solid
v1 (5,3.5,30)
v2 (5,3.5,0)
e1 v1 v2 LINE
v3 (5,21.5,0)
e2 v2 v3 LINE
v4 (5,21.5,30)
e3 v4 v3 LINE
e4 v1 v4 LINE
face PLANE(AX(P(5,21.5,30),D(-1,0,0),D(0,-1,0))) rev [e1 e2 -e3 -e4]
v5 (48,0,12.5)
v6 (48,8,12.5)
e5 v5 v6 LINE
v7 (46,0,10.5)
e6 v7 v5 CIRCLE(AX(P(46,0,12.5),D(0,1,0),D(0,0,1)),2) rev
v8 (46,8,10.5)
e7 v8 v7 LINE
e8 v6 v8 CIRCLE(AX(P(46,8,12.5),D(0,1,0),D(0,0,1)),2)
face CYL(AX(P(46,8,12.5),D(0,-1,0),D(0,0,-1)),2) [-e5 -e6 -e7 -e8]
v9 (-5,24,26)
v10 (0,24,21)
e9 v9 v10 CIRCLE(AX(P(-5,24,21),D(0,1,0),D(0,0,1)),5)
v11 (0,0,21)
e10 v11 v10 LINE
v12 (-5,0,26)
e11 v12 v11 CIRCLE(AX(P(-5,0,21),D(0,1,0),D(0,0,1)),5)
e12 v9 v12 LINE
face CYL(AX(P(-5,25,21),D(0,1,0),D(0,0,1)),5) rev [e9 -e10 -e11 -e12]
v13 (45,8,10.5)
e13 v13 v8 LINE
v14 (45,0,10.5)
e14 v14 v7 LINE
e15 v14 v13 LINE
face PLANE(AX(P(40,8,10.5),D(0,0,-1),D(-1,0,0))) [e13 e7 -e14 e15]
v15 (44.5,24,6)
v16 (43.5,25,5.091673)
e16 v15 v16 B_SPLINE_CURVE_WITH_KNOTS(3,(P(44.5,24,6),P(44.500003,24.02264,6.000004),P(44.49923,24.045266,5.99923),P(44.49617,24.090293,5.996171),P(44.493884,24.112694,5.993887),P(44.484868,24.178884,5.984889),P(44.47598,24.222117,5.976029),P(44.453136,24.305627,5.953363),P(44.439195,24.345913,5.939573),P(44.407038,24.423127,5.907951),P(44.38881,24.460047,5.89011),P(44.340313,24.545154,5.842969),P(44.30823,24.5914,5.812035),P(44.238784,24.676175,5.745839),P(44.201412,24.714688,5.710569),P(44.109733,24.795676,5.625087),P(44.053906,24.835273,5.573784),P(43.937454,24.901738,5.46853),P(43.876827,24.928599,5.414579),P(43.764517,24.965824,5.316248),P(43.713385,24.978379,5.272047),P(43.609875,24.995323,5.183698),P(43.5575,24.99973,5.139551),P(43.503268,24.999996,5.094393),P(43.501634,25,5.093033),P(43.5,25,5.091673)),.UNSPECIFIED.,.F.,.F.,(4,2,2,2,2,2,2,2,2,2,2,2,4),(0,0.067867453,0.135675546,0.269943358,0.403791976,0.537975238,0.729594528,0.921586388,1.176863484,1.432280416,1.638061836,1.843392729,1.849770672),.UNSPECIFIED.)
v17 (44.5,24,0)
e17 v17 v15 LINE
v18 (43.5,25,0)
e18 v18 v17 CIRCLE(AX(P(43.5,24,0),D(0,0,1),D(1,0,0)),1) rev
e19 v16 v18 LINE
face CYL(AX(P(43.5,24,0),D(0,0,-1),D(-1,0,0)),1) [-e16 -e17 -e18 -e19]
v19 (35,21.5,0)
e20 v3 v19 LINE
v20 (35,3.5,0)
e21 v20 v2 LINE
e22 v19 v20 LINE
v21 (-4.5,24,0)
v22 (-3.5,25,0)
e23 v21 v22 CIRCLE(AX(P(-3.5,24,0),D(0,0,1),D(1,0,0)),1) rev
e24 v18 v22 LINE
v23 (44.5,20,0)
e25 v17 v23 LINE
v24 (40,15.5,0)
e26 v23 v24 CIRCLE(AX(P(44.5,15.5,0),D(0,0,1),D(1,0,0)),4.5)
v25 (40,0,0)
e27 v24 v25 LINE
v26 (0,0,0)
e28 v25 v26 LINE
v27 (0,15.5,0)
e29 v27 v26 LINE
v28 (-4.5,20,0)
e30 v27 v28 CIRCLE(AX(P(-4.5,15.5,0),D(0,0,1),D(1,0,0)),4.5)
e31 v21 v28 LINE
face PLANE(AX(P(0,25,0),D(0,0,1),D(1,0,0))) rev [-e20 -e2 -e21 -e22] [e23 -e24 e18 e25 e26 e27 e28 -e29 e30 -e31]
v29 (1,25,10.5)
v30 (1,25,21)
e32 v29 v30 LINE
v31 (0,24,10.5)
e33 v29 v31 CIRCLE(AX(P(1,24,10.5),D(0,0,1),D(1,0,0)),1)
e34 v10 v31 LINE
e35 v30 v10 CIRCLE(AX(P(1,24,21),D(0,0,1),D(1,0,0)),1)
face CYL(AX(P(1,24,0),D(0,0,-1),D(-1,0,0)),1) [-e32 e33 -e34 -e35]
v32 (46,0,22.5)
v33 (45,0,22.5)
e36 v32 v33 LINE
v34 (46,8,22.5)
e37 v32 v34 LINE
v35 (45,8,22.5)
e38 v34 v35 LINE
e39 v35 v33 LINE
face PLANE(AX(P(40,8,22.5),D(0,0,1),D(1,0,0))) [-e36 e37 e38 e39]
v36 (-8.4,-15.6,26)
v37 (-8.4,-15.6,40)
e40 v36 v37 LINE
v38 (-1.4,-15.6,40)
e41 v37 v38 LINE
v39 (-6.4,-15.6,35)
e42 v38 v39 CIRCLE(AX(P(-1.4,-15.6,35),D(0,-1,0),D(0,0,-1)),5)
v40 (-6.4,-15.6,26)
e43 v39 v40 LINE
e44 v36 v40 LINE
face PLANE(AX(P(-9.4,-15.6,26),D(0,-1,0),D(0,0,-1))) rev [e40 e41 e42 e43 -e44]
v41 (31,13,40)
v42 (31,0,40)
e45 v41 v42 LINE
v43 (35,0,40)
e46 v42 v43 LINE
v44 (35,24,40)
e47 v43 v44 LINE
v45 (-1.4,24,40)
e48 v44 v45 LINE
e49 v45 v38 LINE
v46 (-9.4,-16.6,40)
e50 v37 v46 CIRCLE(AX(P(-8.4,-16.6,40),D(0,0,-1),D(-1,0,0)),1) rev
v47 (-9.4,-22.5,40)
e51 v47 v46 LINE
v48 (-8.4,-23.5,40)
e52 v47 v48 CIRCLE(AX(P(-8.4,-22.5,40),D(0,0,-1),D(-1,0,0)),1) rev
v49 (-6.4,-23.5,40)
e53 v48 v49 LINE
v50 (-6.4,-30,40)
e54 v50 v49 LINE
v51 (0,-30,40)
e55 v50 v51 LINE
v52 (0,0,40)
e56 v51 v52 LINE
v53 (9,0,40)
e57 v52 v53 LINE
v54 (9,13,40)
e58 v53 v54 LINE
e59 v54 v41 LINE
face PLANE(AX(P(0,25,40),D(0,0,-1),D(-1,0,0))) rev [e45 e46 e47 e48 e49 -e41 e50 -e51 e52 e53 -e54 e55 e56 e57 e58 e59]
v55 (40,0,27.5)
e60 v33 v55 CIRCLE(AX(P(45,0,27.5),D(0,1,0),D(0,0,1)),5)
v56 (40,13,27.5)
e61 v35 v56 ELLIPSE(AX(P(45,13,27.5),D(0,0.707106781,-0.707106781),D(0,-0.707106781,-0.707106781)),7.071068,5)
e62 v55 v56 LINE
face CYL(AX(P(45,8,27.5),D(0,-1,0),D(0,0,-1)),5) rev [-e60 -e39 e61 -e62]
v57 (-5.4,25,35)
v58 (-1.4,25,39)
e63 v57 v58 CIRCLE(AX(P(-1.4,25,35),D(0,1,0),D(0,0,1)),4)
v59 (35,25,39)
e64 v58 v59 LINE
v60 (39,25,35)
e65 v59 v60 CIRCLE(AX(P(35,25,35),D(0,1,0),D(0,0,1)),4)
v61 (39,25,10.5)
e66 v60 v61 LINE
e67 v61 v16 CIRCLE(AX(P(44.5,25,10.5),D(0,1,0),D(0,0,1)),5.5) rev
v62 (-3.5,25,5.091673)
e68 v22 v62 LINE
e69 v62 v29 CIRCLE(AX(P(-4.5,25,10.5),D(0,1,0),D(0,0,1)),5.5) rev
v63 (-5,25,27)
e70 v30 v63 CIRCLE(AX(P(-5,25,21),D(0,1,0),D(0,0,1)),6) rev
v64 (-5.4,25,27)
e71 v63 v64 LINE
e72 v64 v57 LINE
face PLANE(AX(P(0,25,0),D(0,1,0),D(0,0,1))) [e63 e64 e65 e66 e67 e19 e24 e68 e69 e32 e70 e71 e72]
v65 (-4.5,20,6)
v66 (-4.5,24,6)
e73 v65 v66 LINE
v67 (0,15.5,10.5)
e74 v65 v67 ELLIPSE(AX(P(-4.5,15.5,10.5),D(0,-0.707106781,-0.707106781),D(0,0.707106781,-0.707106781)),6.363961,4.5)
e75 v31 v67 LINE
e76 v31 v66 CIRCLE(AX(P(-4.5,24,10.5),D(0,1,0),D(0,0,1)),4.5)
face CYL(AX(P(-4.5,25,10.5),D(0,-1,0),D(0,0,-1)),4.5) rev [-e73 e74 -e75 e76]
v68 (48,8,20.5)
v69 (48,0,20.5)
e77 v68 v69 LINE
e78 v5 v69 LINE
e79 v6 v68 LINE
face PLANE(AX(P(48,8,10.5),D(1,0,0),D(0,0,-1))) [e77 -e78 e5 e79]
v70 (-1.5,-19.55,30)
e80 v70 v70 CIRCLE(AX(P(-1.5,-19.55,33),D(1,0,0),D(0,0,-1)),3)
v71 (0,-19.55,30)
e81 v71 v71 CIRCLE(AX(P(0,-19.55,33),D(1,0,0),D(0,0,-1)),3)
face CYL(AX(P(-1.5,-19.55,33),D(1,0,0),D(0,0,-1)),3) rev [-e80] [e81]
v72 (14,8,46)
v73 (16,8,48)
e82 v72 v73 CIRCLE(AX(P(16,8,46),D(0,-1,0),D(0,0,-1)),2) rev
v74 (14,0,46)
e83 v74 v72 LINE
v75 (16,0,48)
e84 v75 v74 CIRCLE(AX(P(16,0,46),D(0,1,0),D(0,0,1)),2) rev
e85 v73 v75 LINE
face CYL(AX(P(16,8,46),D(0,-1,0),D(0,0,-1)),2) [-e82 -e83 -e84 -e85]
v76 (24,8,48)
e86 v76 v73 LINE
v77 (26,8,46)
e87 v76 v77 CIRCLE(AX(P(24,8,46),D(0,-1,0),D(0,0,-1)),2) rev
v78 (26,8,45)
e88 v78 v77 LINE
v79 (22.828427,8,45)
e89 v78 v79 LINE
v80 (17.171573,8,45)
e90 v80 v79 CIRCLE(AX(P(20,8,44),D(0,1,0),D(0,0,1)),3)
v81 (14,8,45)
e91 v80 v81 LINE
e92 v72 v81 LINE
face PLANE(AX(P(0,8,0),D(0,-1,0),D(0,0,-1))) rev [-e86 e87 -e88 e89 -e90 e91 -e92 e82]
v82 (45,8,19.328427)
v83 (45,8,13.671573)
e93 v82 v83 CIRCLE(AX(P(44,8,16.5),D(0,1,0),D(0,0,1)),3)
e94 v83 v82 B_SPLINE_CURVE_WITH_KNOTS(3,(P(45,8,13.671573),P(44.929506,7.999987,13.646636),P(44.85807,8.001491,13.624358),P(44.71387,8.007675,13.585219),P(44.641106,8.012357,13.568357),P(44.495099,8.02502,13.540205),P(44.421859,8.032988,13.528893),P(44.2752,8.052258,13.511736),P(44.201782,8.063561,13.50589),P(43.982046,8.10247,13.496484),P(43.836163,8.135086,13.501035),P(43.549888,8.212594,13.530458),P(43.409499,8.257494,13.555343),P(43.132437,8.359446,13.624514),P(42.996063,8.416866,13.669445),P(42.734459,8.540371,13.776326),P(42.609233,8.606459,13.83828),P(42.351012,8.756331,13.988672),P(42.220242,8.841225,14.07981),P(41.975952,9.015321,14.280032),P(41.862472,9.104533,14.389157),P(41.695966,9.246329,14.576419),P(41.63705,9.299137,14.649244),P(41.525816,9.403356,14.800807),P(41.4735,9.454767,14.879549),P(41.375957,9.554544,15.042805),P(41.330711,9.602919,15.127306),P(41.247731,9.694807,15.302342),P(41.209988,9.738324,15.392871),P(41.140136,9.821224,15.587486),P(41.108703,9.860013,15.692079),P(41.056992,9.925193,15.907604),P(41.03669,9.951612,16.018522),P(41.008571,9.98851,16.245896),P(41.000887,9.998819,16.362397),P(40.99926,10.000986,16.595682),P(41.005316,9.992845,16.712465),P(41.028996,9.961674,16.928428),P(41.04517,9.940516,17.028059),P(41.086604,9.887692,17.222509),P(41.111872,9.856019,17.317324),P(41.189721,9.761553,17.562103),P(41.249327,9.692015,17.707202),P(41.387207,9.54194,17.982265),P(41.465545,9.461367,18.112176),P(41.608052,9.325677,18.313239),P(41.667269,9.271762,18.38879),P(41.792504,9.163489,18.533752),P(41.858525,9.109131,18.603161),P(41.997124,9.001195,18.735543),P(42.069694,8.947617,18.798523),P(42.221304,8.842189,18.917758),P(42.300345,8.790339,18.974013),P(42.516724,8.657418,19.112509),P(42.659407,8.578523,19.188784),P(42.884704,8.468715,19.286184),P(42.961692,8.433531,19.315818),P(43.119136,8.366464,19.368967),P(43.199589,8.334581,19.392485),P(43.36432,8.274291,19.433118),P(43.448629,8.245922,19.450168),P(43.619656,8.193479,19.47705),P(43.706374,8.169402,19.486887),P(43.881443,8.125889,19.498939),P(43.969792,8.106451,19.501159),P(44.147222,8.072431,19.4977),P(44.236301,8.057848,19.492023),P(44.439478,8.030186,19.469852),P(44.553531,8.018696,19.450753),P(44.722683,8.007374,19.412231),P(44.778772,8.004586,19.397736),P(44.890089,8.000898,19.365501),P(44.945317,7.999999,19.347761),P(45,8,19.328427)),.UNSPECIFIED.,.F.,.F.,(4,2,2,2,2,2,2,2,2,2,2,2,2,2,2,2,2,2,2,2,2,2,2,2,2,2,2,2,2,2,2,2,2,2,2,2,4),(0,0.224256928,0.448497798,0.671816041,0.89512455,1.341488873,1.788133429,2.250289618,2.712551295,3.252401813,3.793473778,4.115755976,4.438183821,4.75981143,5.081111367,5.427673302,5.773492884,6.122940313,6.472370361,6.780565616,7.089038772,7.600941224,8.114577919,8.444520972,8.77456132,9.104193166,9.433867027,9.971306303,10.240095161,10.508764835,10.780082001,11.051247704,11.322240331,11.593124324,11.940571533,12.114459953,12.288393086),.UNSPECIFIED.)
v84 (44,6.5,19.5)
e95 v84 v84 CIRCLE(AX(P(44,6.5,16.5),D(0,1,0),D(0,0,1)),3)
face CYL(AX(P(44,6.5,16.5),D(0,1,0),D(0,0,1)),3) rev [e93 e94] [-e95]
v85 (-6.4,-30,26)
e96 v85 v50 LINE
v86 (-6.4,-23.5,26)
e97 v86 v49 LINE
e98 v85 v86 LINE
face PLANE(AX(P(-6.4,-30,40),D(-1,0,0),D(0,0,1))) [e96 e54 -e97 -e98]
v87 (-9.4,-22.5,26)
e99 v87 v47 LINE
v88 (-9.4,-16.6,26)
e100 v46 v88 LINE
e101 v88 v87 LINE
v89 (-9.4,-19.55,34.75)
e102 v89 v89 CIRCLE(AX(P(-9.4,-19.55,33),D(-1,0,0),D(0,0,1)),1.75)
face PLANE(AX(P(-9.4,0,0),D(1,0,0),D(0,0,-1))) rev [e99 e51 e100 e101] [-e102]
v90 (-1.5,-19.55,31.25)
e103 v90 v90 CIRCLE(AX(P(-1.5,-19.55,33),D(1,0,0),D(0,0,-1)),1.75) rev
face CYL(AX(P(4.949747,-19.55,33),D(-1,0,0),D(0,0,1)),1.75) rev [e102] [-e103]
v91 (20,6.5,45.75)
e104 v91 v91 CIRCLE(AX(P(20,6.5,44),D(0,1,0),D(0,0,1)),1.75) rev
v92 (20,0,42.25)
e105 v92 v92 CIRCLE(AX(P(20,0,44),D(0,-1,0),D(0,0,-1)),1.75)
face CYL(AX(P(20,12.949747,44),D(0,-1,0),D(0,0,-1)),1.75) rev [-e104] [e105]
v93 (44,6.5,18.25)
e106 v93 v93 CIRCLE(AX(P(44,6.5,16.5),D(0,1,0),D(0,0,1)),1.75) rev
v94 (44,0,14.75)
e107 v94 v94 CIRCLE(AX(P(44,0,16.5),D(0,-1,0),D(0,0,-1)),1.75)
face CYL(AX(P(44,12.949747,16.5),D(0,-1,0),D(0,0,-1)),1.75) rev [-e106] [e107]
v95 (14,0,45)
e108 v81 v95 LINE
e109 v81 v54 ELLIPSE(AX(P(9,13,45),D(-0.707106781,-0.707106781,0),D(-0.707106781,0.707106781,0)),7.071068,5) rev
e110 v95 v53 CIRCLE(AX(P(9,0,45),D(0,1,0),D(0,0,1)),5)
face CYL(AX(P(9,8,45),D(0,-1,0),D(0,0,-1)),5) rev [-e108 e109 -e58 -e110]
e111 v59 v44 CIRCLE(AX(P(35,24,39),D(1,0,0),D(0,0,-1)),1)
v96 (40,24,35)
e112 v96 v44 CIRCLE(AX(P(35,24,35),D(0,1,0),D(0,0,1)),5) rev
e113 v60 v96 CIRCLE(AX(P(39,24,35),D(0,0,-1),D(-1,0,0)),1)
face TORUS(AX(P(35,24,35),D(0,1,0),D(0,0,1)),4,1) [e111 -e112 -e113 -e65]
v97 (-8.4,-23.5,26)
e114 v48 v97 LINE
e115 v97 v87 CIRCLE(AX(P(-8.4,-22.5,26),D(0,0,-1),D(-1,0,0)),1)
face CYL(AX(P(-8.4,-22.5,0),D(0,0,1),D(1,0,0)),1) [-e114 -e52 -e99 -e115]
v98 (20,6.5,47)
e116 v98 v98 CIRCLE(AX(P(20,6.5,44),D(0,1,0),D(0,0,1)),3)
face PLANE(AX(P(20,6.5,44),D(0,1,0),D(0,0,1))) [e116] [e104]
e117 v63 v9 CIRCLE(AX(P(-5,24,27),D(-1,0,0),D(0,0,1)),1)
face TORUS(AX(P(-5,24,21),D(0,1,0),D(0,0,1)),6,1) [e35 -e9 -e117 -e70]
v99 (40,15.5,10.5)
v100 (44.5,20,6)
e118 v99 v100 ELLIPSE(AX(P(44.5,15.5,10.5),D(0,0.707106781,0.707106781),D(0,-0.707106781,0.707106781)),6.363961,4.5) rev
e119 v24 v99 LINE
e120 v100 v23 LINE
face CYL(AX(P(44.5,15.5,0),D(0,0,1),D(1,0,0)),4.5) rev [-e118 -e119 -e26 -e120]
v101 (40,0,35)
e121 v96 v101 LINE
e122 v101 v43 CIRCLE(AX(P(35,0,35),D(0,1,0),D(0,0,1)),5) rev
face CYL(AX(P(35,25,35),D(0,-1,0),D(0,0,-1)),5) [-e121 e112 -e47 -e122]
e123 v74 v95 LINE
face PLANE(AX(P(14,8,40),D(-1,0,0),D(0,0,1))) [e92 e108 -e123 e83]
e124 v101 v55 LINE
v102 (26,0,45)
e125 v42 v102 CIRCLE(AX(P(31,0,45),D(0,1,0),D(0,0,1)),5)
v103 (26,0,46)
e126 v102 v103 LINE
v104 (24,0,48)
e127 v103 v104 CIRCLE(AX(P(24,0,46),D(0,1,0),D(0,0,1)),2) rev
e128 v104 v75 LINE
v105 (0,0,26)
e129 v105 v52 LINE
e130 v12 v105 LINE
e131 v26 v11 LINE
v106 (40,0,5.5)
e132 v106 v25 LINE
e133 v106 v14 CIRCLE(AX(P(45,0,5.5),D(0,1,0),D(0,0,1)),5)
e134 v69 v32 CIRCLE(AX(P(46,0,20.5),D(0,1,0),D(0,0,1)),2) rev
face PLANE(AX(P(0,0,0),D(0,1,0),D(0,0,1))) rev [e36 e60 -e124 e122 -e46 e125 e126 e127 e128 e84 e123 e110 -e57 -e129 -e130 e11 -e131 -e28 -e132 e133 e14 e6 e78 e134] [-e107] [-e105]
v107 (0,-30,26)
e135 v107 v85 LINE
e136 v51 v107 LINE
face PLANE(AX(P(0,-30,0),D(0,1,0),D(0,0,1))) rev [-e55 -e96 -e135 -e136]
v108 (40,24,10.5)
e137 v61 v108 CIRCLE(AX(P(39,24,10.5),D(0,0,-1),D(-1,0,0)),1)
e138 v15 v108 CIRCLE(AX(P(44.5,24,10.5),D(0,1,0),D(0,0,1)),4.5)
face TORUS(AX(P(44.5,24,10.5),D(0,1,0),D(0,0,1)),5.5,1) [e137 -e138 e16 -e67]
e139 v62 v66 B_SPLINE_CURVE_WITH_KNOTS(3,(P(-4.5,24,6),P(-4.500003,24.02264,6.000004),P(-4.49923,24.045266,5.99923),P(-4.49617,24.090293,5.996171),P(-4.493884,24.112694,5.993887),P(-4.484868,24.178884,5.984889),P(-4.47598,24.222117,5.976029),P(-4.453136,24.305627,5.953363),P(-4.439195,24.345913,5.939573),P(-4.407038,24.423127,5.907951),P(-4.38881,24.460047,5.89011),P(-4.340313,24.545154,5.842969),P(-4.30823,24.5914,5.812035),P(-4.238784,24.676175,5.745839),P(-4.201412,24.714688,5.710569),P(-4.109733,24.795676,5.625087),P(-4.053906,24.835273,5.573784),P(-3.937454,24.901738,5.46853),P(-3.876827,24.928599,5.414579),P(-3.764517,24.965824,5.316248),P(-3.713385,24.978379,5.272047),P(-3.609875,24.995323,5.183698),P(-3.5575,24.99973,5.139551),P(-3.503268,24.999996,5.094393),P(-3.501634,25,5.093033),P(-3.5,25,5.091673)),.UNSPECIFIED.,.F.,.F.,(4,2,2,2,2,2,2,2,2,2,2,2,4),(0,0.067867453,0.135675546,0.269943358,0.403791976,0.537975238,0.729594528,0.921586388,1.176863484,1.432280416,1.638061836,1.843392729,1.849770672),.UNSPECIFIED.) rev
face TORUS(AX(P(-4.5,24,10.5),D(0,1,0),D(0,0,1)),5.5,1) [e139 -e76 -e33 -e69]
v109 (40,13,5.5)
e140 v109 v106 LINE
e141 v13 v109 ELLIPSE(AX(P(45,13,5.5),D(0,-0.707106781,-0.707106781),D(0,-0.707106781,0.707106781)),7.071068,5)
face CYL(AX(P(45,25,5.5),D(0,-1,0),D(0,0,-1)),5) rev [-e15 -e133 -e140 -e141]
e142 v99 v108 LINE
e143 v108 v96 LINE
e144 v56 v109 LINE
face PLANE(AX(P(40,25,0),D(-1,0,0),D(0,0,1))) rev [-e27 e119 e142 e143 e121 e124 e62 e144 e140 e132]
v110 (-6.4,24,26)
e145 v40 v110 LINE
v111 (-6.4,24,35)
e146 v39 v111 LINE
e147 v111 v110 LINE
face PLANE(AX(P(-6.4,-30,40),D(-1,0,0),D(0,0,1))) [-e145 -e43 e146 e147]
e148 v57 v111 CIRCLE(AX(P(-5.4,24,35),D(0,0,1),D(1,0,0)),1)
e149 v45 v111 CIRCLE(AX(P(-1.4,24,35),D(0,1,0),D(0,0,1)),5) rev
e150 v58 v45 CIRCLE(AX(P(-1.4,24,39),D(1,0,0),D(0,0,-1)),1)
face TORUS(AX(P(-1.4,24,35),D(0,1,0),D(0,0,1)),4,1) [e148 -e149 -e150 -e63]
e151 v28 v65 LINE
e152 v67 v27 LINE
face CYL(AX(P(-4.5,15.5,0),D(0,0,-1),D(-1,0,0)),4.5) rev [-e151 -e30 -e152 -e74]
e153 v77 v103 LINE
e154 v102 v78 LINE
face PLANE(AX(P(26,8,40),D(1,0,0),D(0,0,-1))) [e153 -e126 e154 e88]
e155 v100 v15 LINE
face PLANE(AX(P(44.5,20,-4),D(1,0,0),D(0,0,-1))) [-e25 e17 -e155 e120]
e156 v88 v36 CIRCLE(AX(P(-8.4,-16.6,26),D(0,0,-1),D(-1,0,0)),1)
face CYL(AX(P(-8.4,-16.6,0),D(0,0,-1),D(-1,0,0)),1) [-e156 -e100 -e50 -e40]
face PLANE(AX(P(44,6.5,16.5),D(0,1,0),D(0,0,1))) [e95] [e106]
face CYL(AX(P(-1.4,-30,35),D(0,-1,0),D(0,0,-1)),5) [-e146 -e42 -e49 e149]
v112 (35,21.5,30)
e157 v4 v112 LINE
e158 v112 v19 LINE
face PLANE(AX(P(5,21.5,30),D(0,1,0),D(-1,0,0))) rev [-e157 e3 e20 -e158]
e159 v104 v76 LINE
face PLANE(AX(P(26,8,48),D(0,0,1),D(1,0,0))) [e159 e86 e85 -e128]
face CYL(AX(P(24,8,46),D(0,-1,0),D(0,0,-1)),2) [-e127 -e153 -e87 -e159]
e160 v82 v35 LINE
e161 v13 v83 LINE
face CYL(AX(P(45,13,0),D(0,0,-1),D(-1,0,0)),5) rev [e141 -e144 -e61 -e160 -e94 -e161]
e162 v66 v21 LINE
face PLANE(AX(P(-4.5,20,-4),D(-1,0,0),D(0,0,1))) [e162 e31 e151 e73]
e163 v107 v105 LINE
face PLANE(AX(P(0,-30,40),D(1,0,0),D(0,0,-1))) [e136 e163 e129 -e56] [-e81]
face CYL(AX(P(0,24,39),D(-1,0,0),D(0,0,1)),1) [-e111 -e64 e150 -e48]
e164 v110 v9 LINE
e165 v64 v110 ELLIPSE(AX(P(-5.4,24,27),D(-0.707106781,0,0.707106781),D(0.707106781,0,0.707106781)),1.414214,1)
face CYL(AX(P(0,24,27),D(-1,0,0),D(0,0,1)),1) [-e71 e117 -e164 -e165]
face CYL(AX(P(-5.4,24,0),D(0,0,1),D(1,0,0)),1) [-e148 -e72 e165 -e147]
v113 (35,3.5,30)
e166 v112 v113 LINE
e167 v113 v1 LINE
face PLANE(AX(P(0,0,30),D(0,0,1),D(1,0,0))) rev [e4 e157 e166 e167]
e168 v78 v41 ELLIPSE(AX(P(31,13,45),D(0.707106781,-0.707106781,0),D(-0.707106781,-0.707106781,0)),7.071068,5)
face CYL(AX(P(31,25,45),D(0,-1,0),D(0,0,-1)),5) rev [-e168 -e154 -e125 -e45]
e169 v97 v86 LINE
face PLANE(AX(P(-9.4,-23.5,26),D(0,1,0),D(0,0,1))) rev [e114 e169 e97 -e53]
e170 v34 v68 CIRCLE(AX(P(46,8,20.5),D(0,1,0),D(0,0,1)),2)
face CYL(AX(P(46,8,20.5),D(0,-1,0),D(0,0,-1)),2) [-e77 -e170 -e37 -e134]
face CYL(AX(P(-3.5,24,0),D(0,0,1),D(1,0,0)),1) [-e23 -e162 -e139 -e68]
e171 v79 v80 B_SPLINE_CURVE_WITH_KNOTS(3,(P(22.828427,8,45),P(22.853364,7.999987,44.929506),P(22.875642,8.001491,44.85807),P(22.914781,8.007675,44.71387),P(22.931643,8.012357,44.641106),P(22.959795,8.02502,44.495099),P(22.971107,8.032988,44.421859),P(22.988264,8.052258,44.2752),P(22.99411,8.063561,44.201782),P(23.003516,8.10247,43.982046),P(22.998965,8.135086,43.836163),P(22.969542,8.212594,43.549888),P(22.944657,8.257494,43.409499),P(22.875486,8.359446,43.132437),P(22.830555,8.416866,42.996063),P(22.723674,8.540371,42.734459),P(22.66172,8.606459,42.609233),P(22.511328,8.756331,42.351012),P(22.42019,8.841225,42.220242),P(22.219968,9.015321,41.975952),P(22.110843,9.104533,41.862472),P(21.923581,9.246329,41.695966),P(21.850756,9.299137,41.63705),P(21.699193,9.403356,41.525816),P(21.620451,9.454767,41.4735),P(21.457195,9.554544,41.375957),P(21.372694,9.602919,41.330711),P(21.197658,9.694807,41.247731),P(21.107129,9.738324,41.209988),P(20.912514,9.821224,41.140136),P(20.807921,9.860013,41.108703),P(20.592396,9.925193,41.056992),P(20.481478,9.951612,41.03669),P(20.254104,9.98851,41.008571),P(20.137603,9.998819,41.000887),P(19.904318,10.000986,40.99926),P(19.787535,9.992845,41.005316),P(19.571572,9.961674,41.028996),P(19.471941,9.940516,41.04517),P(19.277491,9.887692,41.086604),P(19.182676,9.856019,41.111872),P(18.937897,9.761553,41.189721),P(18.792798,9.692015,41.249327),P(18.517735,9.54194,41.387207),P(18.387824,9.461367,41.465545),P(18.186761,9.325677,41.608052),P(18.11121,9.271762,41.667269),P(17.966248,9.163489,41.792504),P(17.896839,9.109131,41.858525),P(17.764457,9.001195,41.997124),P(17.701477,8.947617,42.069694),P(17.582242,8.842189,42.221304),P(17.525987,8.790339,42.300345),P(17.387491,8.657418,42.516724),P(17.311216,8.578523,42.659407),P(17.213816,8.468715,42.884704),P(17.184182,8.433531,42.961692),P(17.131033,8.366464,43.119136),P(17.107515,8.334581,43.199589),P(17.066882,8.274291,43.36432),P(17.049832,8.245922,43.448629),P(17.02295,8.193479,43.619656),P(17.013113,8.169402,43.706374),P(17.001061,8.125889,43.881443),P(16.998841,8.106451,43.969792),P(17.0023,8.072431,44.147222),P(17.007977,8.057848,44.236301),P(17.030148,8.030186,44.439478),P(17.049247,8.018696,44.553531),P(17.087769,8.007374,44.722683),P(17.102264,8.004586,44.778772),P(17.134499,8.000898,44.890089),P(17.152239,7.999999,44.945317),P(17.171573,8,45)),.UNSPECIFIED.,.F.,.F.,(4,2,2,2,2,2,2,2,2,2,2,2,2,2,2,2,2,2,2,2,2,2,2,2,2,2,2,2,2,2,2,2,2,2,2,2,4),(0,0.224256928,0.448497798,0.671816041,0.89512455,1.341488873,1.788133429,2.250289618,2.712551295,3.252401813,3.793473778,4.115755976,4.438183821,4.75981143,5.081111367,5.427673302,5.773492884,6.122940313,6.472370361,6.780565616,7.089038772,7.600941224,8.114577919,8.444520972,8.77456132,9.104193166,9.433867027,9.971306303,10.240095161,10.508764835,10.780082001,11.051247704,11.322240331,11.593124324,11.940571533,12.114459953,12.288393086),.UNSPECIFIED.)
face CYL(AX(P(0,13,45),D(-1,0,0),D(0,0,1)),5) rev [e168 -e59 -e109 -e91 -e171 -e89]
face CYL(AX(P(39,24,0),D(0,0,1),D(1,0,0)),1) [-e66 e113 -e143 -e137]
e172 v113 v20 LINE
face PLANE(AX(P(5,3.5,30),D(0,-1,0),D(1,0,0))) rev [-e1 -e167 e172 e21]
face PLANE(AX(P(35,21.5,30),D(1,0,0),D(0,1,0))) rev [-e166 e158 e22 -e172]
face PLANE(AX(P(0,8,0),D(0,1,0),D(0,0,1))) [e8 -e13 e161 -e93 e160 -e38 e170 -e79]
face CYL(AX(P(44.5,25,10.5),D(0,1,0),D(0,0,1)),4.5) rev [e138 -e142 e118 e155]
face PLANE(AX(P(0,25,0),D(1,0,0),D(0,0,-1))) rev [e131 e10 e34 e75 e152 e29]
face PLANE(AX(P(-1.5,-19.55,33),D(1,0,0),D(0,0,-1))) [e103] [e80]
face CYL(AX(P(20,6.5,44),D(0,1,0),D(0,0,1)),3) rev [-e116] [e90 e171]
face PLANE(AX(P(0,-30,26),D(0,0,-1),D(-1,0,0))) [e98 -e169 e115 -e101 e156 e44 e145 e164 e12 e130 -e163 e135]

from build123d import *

# Parameters (mm, degrees)
CROQUIS1_W              = 40
CROQUIS1_H              = 40
SALIENTE_EXTRUIR1_DEPTH = 25
CROQUIS3_W              = 30
CROQUIS3_H              = 18
CORTAR_EXTRUIR1_DEPTH   = 30
CROQUIS4_W              = 9
CROQUIS4_H              = 10
SALIENTE_EXTRUIR2_DEPTH = 5
REDONDEO3_R             = 4.5
CROQUIS6_W              = 6.4
CROQUIS6_H              = 14
SALIENTE_EXTRUIR3_DEPTH = 55
CROQUIS7_W              = 14
CROQUIS7_H              = 7.9
SALIENTE_EXTRUIR4_DEPTH = 3
CROQUIS8_R              = 1.75
CORTAR_EXTRUIR2_DEPTH   = 9.4
CROQUIS9_R              = 3
CORTAR_EXTRUIR3_DEPTH   = 1.5
REDONDEO4_R             = 1
CROQUIS10_W             = 8
CROQUIS10_H             = 12
CROQUIS10_W_2           = 12
CROQUIS10_H_2           = 8
SALIENTE_EXTRUIR5_DEPTH = 8
CROQUIS11_R             = 1.75
CORTAR_EXTRUIR4_DEPTH   = 8
CROQUIS12_R             = 3
CORTAR_EXTRUIR5_DEPTH   = 1.5
REDONDEO5_R             = 5
REDONDEO6_R             = 1
REDONDEO7_R             = 2
CROQUIS13_W             = 9
CROQUIS13_H             = 4
CORTAR_EXTRUIR6_DEPTH   = 85.308955633


# Some blends are built 0.0001 mm under size
with BuildPart() as part:
    # Croquis1 → Saliente-Extruir1 (new body)
    with BuildSketch(Plane(origin=(0, 0, 0), x_dir=(1, 0, 0), z_dir=(0, 1, 0))):
        with Locations((20, -20)):
            Rectangle(CROQUIS1_W, CROQUIS1_H)
    extrude(amount=SALIENTE_EXTRUIR1_DEPTH)

    # Croquis3 → Cortar-Extruir1 (cut)
    with BuildSketch(Plane(origin=(0, 0, 0), x_dir=(-1, 0, 0), z_dir=(0, 0, -1))):
        with Locations((-20, 12.5)):
            Rectangle(CROQUIS3_W, CROQUIS3_H)
    extrude(amount=-CORTAR_EXTRUIR1_DEPTH, mode=Mode.SUBTRACT)

    # Croquis4 → Saliente-Extruir2 (add)
    with BuildSketch(Plane(origin=(0, 25, 0), x_dir=(1, 0, 0), z_dir=(0, 1, 0))):
        with Locations((40, -1)):
            Rectangle(CROQUIS4_W, CROQUIS4_H)
        with Locations((0, -1)):
            Rectangle(CROQUIS4_W, CROQUIS4_H)
    extrude(amount=-SALIENTE_EXTRUIR2_DEPTH)

    # Redondeo3
    redondeo3_edges = [part.edges().sort_by_distance(p)[0] for p in [
        (0, 22.5, 6),
        (40, 22.5, 6),
        (0, 20, 3),
        (40, 20, 3),
    ]]
    fillet(redondeo3_edges, radius=REDONDEO3_R - 0.0001)  # a hair under: the kernel refuses the full size

    # Croquis6 → Saliente-Extruir3 (add)
    with BuildSketch(Plane(origin=(0, 25, 0), x_dir=(1, 0, 0), z_dir=(0, 1, 0))):
        with Locations((-3.2, -33)):
            Rectangle(CROQUIS6_W, CROQUIS6_H)
    extrude(amount=-SALIENTE_EXTRUIR3_DEPTH)

    # Croquis7 → Saliente-Extruir4 (add)
    with BuildSketch(Plane.ZY.offset(6.4)):
        with Locations((33, -19.55)):
            Rectangle(CROQUIS7_W, CROQUIS7_H)
    extrude(amount=SALIENTE_EXTRUIR4_DEPTH)

    # Croquis8 → Cortar-Extruir2 (cut)
    with BuildSketch(Plane.ZY.offset(9.4)):
        with Locations((33, -19.55)):
            Circle(CROQUIS8_R)
    extrude(amount=-CORTAR_EXTRUIR2_DEPTH, mode=Mode.SUBTRACT)

    # Croquis9 → Cortar-Extruir3 (cut)
    with BuildSketch(Plane(origin=(0, 0, 0), x_dir=(0, 0, -1), z_dir=(1, 0, 0))):
        with Locations((-33, -19.55)):
            Circle(CROQUIS9_R)
    extrude(amount=-CORTAR_EXTRUIR3_DEPTH, mode=Mode.SUBTRACT)

    # Redondeo4
    redondeo4_edges = [part.edges().sort_by_distance(p)[0] for p in [
        (-9.4, -23.5, 33),
        (-9.4, -15.6, 33),
    ]]
    fillet(redondeo4_edges, radius=REDONDEO4_R)

    # Croquis10 → Saliente-Extruir5 (add)
    with BuildSketch(Plane.XZ):
        with Locations((44, 16.5)):
            Rectangle(CROQUIS10_W, CROQUIS10_H)
        with Locations((20, 44)):
            Rectangle(CROQUIS10_W_2, CROQUIS10_H_2)
    extrude(amount=-SALIENTE_EXTRUIR5_DEPTH)

    # Croquis11 → Cortar-Extruir4 (cut)
    with BuildSketch(Plane.XZ):
        with Locations(Location((44, 16.5, 0), (0, 0, 270))):
            Circle(CROQUIS11_R)
        with Locations(Location((20, 44, 0), (0, 0, 270))):
            Circle(CROQUIS11_R)
    extrude(amount=-CORTAR_EXTRUIR4_DEPTH, mode=Mode.SUBTRACT)

    # Croquis12 → Cortar-Extruir5 (cut)
    with BuildSketch(Plane(origin=(0, 8, 0), x_dir=(1, 0, 0), z_dir=(0, 1, 0))):
        with Locations(Location((44, -16.5, 0), (0, 0, 270))):
            Circle(CROQUIS12_R)
        with Locations(Location((20, -44, 0), (0, 0, 270))):
            Circle(CROQUIS12_R)
    extrude(amount=-CORTAR_EXTRUIR5_DEPTH, mode=Mode.SUBTRACT)

    # Redondeo5
    # the kernel refuses this fillet: 5 mm, written as the material it adds along each edge
    with BuildSketch(Plane(origin=(0, 25, 26), x_dir=(-1, 0, 0), z_dir=(0, -1, 0))) as redondeo5_piece_1_section:
        with BuildLine():
            CenterArc((REDONDEO5_R, REDONDEO5_R), REDONDEO5_R, 180, 90)
            Line((0, REDONDEO5_R), (-REDONDEO5_R * 0.02, REDONDEO5_R))
            Line((-REDONDEO5_R * 0.02, REDONDEO5_R), (-REDONDEO5_R * 0.02, -REDONDEO5_R * 0.02))
            Line((-REDONDEO5_R * 0.02, -REDONDEO5_R * 0.02), (REDONDEO5_R, -REDONDEO5_R * 0.02))
            Line((REDONDEO5_R, -REDONDEO5_R * 0.02), (REDONDEO5_R, 0))
        make_face()
    redondeo5_piece_1 = extrude(amount=25, mode=Mode.PRIVATE)
    redondeo5_piece_1 = split(redondeo5_piece_1, bisect_by=Plane(origin=(0, 12.5, 24.982634351), z_dir=(-1, 0, 0)), keep=Keep.TOP, mode=Mode.PRIVATE)
    add(redondeo5_piece_1)
    with BuildSketch(Plane(origin=(40, 8, 22.5), x_dir=(0, 1, 0), z_dir=(0, 0, -1))) as redondeo5_piece_2_section:
        with BuildLine():
            CenterArc((REDONDEO5_R, REDONDEO5_R), REDONDEO5_R, 180, 90)
            Line((0, REDONDEO5_R), (-REDONDEO5_R * 0.02, REDONDEO5_R))
            Line((-REDONDEO5_R * 0.02, REDONDEO5_R), (-REDONDEO5_R * 0.02, -REDONDEO5_R * 0.02))
            Line((-REDONDEO5_R * 0.02, -REDONDEO5_R * 0.02), (REDONDEO5_R, -REDONDEO5_R * 0.02))
            Line((REDONDEO5_R, -REDONDEO5_R * 0.02), (REDONDEO5_R, 0))
        make_face()
    redondeo5_piece_2 = extrude(amount=12, mode=Mode.PRIVATE)
    redondeo5_piece_2 = redondeo5_piece_2 - Plane(origin=(44, 9.261889054, 16.5), x_dir=(0, 0, 1), z_dir=(0, 1, 0)) * Cylinder(3, 44, mode=Mode.PRIVATE)
    add(redondeo5_piece_2)
    with BuildSketch(Plane(origin=(40, 0, 10.5), x_dir=(0, 0, -1), z_dir=(0, 1, 0)), Plane(origin=(26, 0, 40), x_dir=(1, 0, 0), z_dir=(0, 1, 0))) as redondeo5_piece_3:
        with BuildLine():
            CenterArc((REDONDEO5_R, -REDONDEO5_R), REDONDEO5_R, 90, 90)
            Line((0, -REDONDEO5_R), (-REDONDEO5_R * 0.02, -REDONDEO5_R))
            Line((-REDONDEO5_R * 0.02, -REDONDEO5_R), (-REDONDEO5_R * 0.02, REDONDEO5_R * 0.02))
            Line((-REDONDEO5_R * 0.02, REDONDEO5_R * 0.02), (REDONDEO5_R, REDONDEO5_R * 0.02))
            Line((REDONDEO5_R, REDONDEO5_R * 0.02), (REDONDEO5_R, 0))
        make_face()
    extrude(amount=8)
    with BuildSketch(Plane(origin=(40, 0, 22.5), x_dir=(0, 0, 1), z_dir=(0, 1, 0)), Plane(origin=(14, 0, 40), x_dir=(-1, 0, 0), z_dir=(0, 1, 0))) as redondeo5_piece_4:
        with BuildLine():
            CenterArc((REDONDEO5_R, REDONDEO5_R), REDONDEO5_R, 180, 90)
            Line((0, REDONDEO5_R), (-REDONDEO5_R * 0.02, REDONDEO5_R))
            Line((-REDONDEO5_R * 0.02, REDONDEO5_R), (-REDONDEO5_R * 0.02, -REDONDEO5_R * 0.02))
            Line((-REDONDEO5_R * 0.02, -REDONDEO5_R * 0.02), (REDONDEO5_R, -REDONDEO5_R * 0.02))
            Line((REDONDEO5_R, -REDONDEO5_R * 0.02), (REDONDEO5_R, 0))
        make_face()
    extrude(amount=8)
    with BuildSketch(Plane(origin=(26, 8, 40), x_dir=(0, 1, 0), z_dir=(-1, 0, 0))) as redondeo5_piece_5_section:
        with BuildLine():
            CenterArc((REDONDEO5_R, -REDONDEO5_R), REDONDEO5_R, 90, 90)
            Line((0, -REDONDEO5_R), (-REDONDEO5_R * 0.02, -REDONDEO5_R))
            Line((-REDONDEO5_R * 0.02, -REDONDEO5_R), (-REDONDEO5_R * 0.02, REDONDEO5_R * 0.02))
            Line((-REDONDEO5_R * 0.02, REDONDEO5_R * 0.02), (REDONDEO5_R, REDONDEO5_R * 0.02))
            Line((REDONDEO5_R, REDONDEO5_R * 0.02), (REDONDEO5_R, 0))
        make_face()
    redondeo5_piece_5 = extrude(amount=12, mode=Mode.PRIVATE)
    redondeo5_piece_5 = redondeo5_piece_5 - Plane(origin=(20, 9.261884867, 44), x_dir=(0, 0, 1), z_dir=(0, 1, 0)) * Cylinder(3, 44, mode=Mode.PRIVATE)
    add(redondeo5_piece_5)
    with BuildSketch(Plane(origin=(40, 8, 35), x_dir=(0, 1, 0), z_dir=(0, 0, -1))) as redondeo5_piece_6a_section:
        with BuildLine():
            CenterArc((REDONDEO5_R, REDONDEO5_R), REDONDEO5_R, 180, 90)
            Line((0, REDONDEO5_R), (-REDONDEO5_R * 0.02, REDONDEO5_R))
            Line((-REDONDEO5_R * 0.02, REDONDEO5_R), (-REDONDEO5_R * 0.02, -REDONDEO5_R * 0.02))
            Line((-REDONDEO5_R * 0.02, -REDONDEO5_R * 0.02), (REDONDEO5_R, -REDONDEO5_R * 0.02))
            Line((REDONDEO5_R, -REDONDEO5_R * 0.02), (REDONDEO5_R, 0))
        make_face()
    redondeo5_piece_6a = extrude(amount=24.5, mode=Mode.PRIVATE)
    redondeo5_piece_6a = split(redondeo5_piece_6a, bisect_by=Plane(origin=(41.131975571, 9.131975571, 22.5), z_dir=(0, 0, 1)), keep=Keep.TOP, mode=Mode.PRIVATE)
    with BuildSketch(Plane(origin=(40, 0, 22.5), x_dir=(0, 0, 1), z_dir=(0, 1, 0))) as redondeo5_piece_6b_section:
        with BuildLine():
            CenterArc((REDONDEO5_R, REDONDEO5_R), REDONDEO5_R, 180, 90)
            Line((0, REDONDEO5_R), (-REDONDEO5_R * 0.02, REDONDEO5_R))
            Line((-REDONDEO5_R * 0.02, REDONDEO5_R), (-REDONDEO5_R * 0.02, -REDONDEO5_R * 0.02))
            Line((-REDONDEO5_R * 0.02, -REDONDEO5_R * 0.02), (REDONDEO5_R, -REDONDEO5_R * 0.02))
            Line((REDONDEO5_R, -REDONDEO5_R * 0.02), (REDONDEO5_R, 0))
        make_face()
    redondeo5_piece_6b = extrude(amount=20.5, mode=Mode.PRIVATE)
    redondeo5_piece_6b = split(redondeo5_piece_6b, bisect_by=Plane(origin=(41.131975571, 8, 23.631975571), z_dir=(0, 1, 0)), keep=Keep.TOP, mode=Mode.PRIVATE)
    redondeo5_piece_6 = redondeo5_piece_6a & redondeo5_piece_6b
    add(redondeo5_piece_6)
    with BuildSketch(Plane(origin=(40, 0, 10.5), x_dir=(0, 0, -1), z_dir=(0, 1, 0))) as redondeo5_piece_7a_section:
        with BuildLine():
            CenterArc((REDONDEO5_R, -REDONDEO5_R), REDONDEO5_R, 90, 90)
            Line((0, -REDONDEO5_R), (-REDONDEO5_R * 0.02, -REDONDEO5_R))
            Line((-REDONDEO5_R * 0.02, -REDONDEO5_R), (-REDONDEO5_R * 0.02, REDONDEO5_R * 0.02))
            Line((-REDONDEO5_R * 0.02, REDONDEO5_R * 0.02), (REDONDEO5_R, REDONDEO5_R * 0.02))
            Line((REDONDEO5_R, REDONDEO5_R * 0.02), (REDONDEO5_R, 0))
        make_face()
    redondeo5_piece_7a = extrude(amount=20.5, mode=Mode.PRIVATE)
    redondeo5_piece_7a = split(redondeo5_piece_7a, bisect_by=Plane(origin=(41.131975571, 8, 9.368024429), z_dir=(0, 1, 0)), keep=Keep.TOP, mode=Mode.PRIVATE)
    with BuildSketch(Plane(origin=(40, 8, 22.5), x_dir=(0, 1, 0), z_dir=(0, 0, -1))) as redondeo5_piece_7b_section:
        with BuildLine():
            CenterArc((REDONDEO5_R, REDONDEO5_R), REDONDEO5_R, 180, 90)
            Line((0, REDONDEO5_R), (-REDONDEO5_R * 0.02, REDONDEO5_R))
            Line((-REDONDEO5_R * 0.02, REDONDEO5_R), (-REDONDEO5_R * 0.02, -REDONDEO5_R * 0.02))
            Line((-REDONDEO5_R * 0.02, -REDONDEO5_R * 0.02), (REDONDEO5_R, -REDONDEO5_R * 0.02))
            Line((REDONDEO5_R, -REDONDEO5_R * 0.02), (REDONDEO5_R, 0))
        make_face()
    redondeo5_piece_7b = extrude(amount=24.5, mode=Mode.PRIVATE)
    redondeo5_piece_7b = split(redondeo5_piece_7b, bisect_by=Plane(origin=(41.131975571, 9.131975571, 0), z_dir=(0, 0, 1)), keep=Keep.TOP, mode=Mode.PRIVATE)
    redondeo5_piece_7b = split(redondeo5_piece_7b, bisect_by=Plane(origin=(41.131975571, 9.131975571, 10.5), z_dir=(0, 0, -1)), keep=Keep.TOP, mode=Mode.PRIVATE)
    redondeo5_piece_7 = redondeo5_piece_7a & redondeo5_piece_7b
    add(redondeo5_piece_7)
    with BuildSketch(Plane(origin=(26, 0, 40), x_dir=(1, 0, 0), z_dir=(0, 1, 0))) as redondeo5_piece_8a_section:
        with BuildLine():
            CenterArc((REDONDEO5_R, -REDONDEO5_R), REDONDEO5_R, 90, 90)
            Line((0, -REDONDEO5_R), (-REDONDEO5_R * 0.02, -REDONDEO5_R))
            Line((-REDONDEO5_R * 0.02, -REDONDEO5_R), (-REDONDEO5_R * 0.02, REDONDEO5_R * 0.02))
            Line((-REDONDEO5_R * 0.02, REDONDEO5_R * 0.02), (REDONDEO5_R, REDONDEO5_R * 0.02))
            Line((REDONDEO5_R, REDONDEO5_R * 0.02), (REDONDEO5_R, 0))
        make_face()
    redondeo5_piece_8a = extrude(amount=20.5, mode=Mode.PRIVATE)
    redondeo5_piece_8a = split(redondeo5_piece_8a, bisect_by=Plane(origin=(27.131975571, 8, 41.131975571), z_dir=(0, 1, 0)), keep=Keep.TOP, mode=Mode.PRIVATE)
    with BuildSketch(Plane(origin=(38.5, 8, 40), x_dir=(0, 1, 0), z_dir=(-1, 0, 0))) as redondeo5_piece_8b_section:
        with BuildLine():
            CenterArc((REDONDEO5_R, -REDONDEO5_R), REDONDEO5_R, 90, 90)
            Line((0, -REDONDEO5_R), (-REDONDEO5_R * 0.02, -REDONDEO5_R))
            Line((-REDONDEO5_R * 0.02, -REDONDEO5_R), (-REDONDEO5_R * 0.02, REDONDEO5_R * 0.02))
            Line((-REDONDEO5_R * 0.02, REDONDEO5_R * 0.02), (REDONDEO5_R, REDONDEO5_R * 0.02))
            Line((REDONDEO5_R, REDONDEO5_R * 0.02), (REDONDEO5_R, 0))
        make_face()
    redondeo5_piece_8b = extrude(amount=24.5, mode=Mode.PRIVATE)
    redondeo5_piece_8b = split(redondeo5_piece_8b, bisect_by=Plane(origin=(26, 9.131975571, 41.131975571), z_dir=(1, 0, 0)), keep=Keep.TOP, mode=Mode.PRIVATE)
    redondeo5_piece_8 = redondeo5_piece_8a & redondeo5_piece_8b
    add(redondeo5_piece_8)
    with BuildSketch(Plane(origin=(26, 8, 40), x_dir=(0, 1, 0), z_dir=(-1, 0, 0))) as redondeo5_piece_9a_section:
        with BuildLine():
            CenterArc((REDONDEO5_R, -REDONDEO5_R), REDONDEO5_R, 90, 90)
            Line((0, -REDONDEO5_R), (-REDONDEO5_R * 0.02, -REDONDEO5_R))
            Line((-REDONDEO5_R * 0.02, -REDONDEO5_R), (-REDONDEO5_R * 0.02, REDONDEO5_R * 0.02))
            Line((-REDONDEO5_R * 0.02, REDONDEO5_R * 0.02), (REDONDEO5_R, REDONDEO5_R * 0.02))
            Line((REDONDEO5_R, REDONDEO5_R * 0.02), (REDONDEO5_R, 0))
        make_face()
    redondeo5_piece_9a = extrude(amount=24.5, mode=Mode.PRIVATE)
    redondeo5_piece_9a = split(redondeo5_piece_9a, bisect_by=Plane(origin=(14, 9.131975571, 41.131975571), z_dir=(-1, 0, 0)), keep=Keep.TOP, mode=Mode.PRIVATE)
    with BuildSketch(Plane(origin=(14, 0, 40), x_dir=(-1, 0, 0), z_dir=(0, 1, 0))) as redondeo5_piece_9b_section:
        with BuildLine():
            CenterArc((REDONDEO5_R, REDONDEO5_R), REDONDEO5_R, 180, 90)
            Line((0, REDONDEO5_R), (-REDONDEO5_R * 0.02, REDONDEO5_R))
            Line((-REDONDEO5_R * 0.02, REDONDEO5_R), (-REDONDEO5_R * 0.02, -REDONDEO5_R * 0.02))
            Line((-REDONDEO5_R * 0.02, -REDONDEO5_R * 0.02), (REDONDEO5_R, -REDONDEO5_R * 0.02))
            Line((REDONDEO5_R, -REDONDEO5_R * 0.02), (REDONDEO5_R, 0))
        make_face()
    redondeo5_piece_9b = extrude(amount=20.5, mode=Mode.PRIVATE)
    redondeo5_piece_9b = split(redondeo5_piece_9b, bisect_by=Plane(origin=(12.868024429, 8, 41.131975571), z_dir=(0, 1, 0)), keep=Keep.TOP, mode=Mode.PRIVATE)
    redondeo5_piece_9 = redondeo5_piece_9a & redondeo5_piece_9b
    add(redondeo5_piece_9)
    # the kernel refuses this fillet: 5 mm, written as the material it takes off along each edge
    with BuildSketch(Plane(origin=(-6.4, 25, 40), x_dir=(1, 0, 0), z_dir=(0, -1, 0))) as redondeo5_2_piece_1:
        with BuildLine():
            CenterArc((REDONDEO5_R, -REDONDEO5_R), REDONDEO5_R, 90, 90)
            Line((0, -REDONDEO5_R), (-REDONDEO5_R * 0.02, -REDONDEO5_R))
            Line((-REDONDEO5_R * 0.02, -REDONDEO5_R), (-REDONDEO5_R * 0.02, REDONDEO5_R * 0.02))
            Line((-REDONDEO5_R * 0.02, REDONDEO5_R * 0.02), (REDONDEO5_R, REDONDEO5_R * 0.02))
            Line((REDONDEO5_R, REDONDEO5_R * 0.02), (REDONDEO5_R, 0))
        make_face()
    extrude(amount=40.6, mode=Mode.SUBTRACT)
    with BuildSketch(Plane(origin=(40, 0, 40), x_dir=(-1, 0, 0), z_dir=(0, 1, 0))) as redondeo5_2_piece_2:
        with BuildLine():
            CenterArc((REDONDEO5_R, -REDONDEO5_R), REDONDEO5_R, 90, 90)
            Line((0, -REDONDEO5_R), (-REDONDEO5_R * 0.02, -REDONDEO5_R))
            Line((-REDONDEO5_R * 0.02, -REDONDEO5_R), (-REDONDEO5_R * 0.02, REDONDEO5_R * 0.02))
            Line((-REDONDEO5_R * 0.02, REDONDEO5_R * 0.02), (REDONDEO5_R, REDONDEO5_R * 0.02))
            Line((REDONDEO5_R, REDONDEO5_R * 0.02), (REDONDEO5_R, 0))
        make_face()
    extrude(amount=25, mode=Mode.SUBTRACT)

    # Redondeo6
    # the kernel refuses this fillet: 1 mm, written as the material it takes off along each edge
    with BuildSketch(Plane(origin=(-6.4, 25, 35), x_dir=(1, 0, 0), z_dir=(0, 0, -1))) as redondeo6_piece_1:
        with BuildLine():
            CenterArc((REDONDEO6_R, REDONDEO6_R), REDONDEO6_R, 180, 90)
            Line((0, REDONDEO6_R), (0, 0))
            Line((0, 0), (REDONDEO6_R, 0))
        make_face()
    extrude(amount=11.5, mode=Mode.SUBTRACT)
    with BuildSketch(Plane(origin=(-8.9, 25, 26), x_dir=(0, 0, 1), z_dir=(1, 0, 0))) as redondeo6_piece_2:
        with BuildLine():
            CenterArc((REDONDEO6_R, REDONDEO6_R), REDONDEO6_R, 180, 90)
            Line((0, REDONDEO6_R), (0, 0))
            Line((0, 0), (REDONDEO6_R, 0))
        make_face()
    extrude(amount=3.9, mode=Mode.SUBTRACT)
    with BuildSketch(Plane(origin=(-1.4, 25, 40), x_dir=(0, -1, 0), z_dir=(1, 0, 0))) as redondeo6_piece_3:
        with BuildLine():
            CenterArc((REDONDEO6_R, REDONDEO6_R), REDONDEO6_R, 180, 90)
            Line((0, REDONDEO6_R), (0, 0))
            Line((0, 0), (REDONDEO6_R, 0))
        make_face()
    extrude(amount=36.4, mode=Mode.SUBTRACT)
    with BuildSketch(Plane(origin=(40, 25, 10.4999), x_dir=(-1, 0, 0), z_dir=(0, 0, 1))) as redondeo6_piece_4:
        with BuildLine():
            CenterArc((REDONDEO6_R, REDONDEO6_R), REDONDEO6_R, 180, 90)
            Line((0, REDONDEO6_R), (0, 0))
            Line((0, 0), (REDONDEO6_R, 0))
        make_face()
    extrude(amount=24.5001, mode=Mode.SUBTRACT)
    with BuildSketch(Plane(origin=(35, 25, 35), x_dir=(0, 0, 1), z_dir=(-1, 0, 0))) as redondeo6_piece_5:
        with BuildLine():
            CenterArc((5 - REDONDEO6_R, -REDONDEO6_R), REDONDEO6_R, 0, 90)
            Line((5, -REDONDEO6_R), (5, 0))
            Line((5, 0), (5 - REDONDEO6_R, 0))
        make_face()
    revolve(axis=Axis((35, 25, 35), (0, 1, 0)), revolution_arc=90, mode=Mode.SUBTRACT)
    with BuildSketch(Plane(origin=(-1.4, 25, 35), x_dir=(0, 0, 1), z_dir=(1, 0, 0))) as redondeo6_piece_6:
        with BuildLine():
            CenterArc((5 - REDONDEO6_R, REDONDEO6_R), REDONDEO6_R, 270, 90)
            Line((5 - REDONDEO6_R, 0), (5, 0))
            Line((5, 0), (5, REDONDEO6_R))
        make_face()
    revolve(axis=Axis((-1.4, 25, 35), (0, -1, 0)), revolution_arc=90, mode=Mode.SUBTRACT)
    with BuildSketch(Plane(origin=(-5, 25, 21), x_dir=(1, 0, 0), z_dir=(0, 0, -1))) as redondeo6_piece_7:
        with BuildLine():
            CenterArc((5 + REDONDEO6_R, REDONDEO6_R), REDONDEO6_R, 180, 90)
            Line((5, REDONDEO6_R), (5, 0))
            Line((5, 0), (5 + REDONDEO6_R, 0))
        make_face()
    revolve(axis=Axis((-5, 25, 21), (0, -1, 0)), revolution_arc=90, mode=Mode.SUBTRACT)
    with BuildSketch(Plane(origin=(44.5, 25, -6.5), x_dir=(-1, 0, 0), z_dir=(0, 0, 1))) as redondeo6_piece_8:
        with BuildLine():
            CenterArc((REDONDEO6_R, REDONDEO6_R), REDONDEO6_R, 180, 90)
            Line((0, REDONDEO6_R), (0, 0))
            Line((0, 0), (REDONDEO6_R, 0))
        make_face()
    extrude(amount=15, mode=Mode.SUBTRACT)
    with BuildSketch(Plane(origin=(-4.5, 25, -6.5), x_dir=(1, 0, 0), z_dir=(0, 0, 1))) as redondeo6_piece_9:
        with BuildLine():
            CenterArc((REDONDEO6_R, -REDONDEO6_R), REDONDEO6_R, 90, 90)
            Line((0, -REDONDEO6_R), (0, 0))
            Line((0, 0), (REDONDEO6_R, 0))
        make_face()
    extrude(amount=15, mode=Mode.SUBTRACT)
    with BuildSketch(Plane(origin=(0, 25, 21), x_dir=(1, 0, 0), z_dir=(0, 0, -1))) as redondeo6_piece_10:
        with BuildLine():
            CenterArc((REDONDEO6_R, REDONDEO6_R), REDONDEO6_R, 180, 90)
            Line((0, REDONDEO6_R), (0, 0))
            Line((0, 0), (REDONDEO6_R, 0))
        make_face()
    extrude(amount=10.5001, mode=Mode.SUBTRACT)
    with BuildSketch(Plane(origin=(-4.4999, 25, 10.4999), x_dir=(1, 0, 0), z_dir=(0, 0, 1))) as redondeo6_piece_11:
        with BuildLine():
            CenterArc((4.4999 + REDONDEO6_R, -REDONDEO6_R), REDONDEO6_R, 90, 90)
            Line((4.4999, -REDONDEO6_R), (4.4999, 0))
            Line((4.4999, 0), (4.4999 + REDONDEO6_R, 0))
        make_face()
    revolve(axis=Axis((-4.4999, 25, 10.4999), (0, 1, 0)), revolution_arc=90, mode=Mode.SUBTRACT)
    with BuildSketch(Plane(origin=(44.4999, 25, 10.4999), x_dir=(-1, 0, 0), z_dir=(0, 0, 1))) as redondeo6_piece_12:
        with BuildLine():
            CenterArc((4.4999 + REDONDEO6_R, REDONDEO6_R), REDONDEO6_R, 180, 90)
            Line((4.4999, REDONDEO6_R), (4.4999, 0))
            Line((4.4999, 0), (4.4999 + REDONDEO6_R, 0))
        make_face()
    revolve(axis=Axis((44.4999, 25, 10.4999), (0, -1, 0)), revolution_arc=90, mode=Mode.SUBTRACT)
    with BuildSketch(Plane(origin=(47, 25, 6), x_dir=(0, 0, -1), z_dir=(-1, 0, 0))) as redondeo6_piece_13:
        with BuildLine():
            CenterArc((REDONDEO6_R, REDONDEO6_R), REDONDEO6_R, 180, 90)
            Line((0, REDONDEO6_R), (0, 0))
            Line((0, 0), (REDONDEO6_R, 0))
        make_face()
    extrude(amount=2.5001, mode=Mode.SUBTRACT)
    with BuildSketch(Plane(origin=(-7, 25, 6), x_dir=(0, 0, -1), z_dir=(1, 0, 0))) as redondeo6_piece_14:
        with BuildLine():
            CenterArc((REDONDEO6_R, -REDONDEO6_R), REDONDEO6_R, 90, 90)
            Line((0, -REDONDEO6_R), (0, 0))
            Line((0, 0), (REDONDEO6_R, 0))
        make_face()
    extrude(amount=2.5001, mode=Mode.SUBTRACT)

    # Redondeo7
    redondeo7_edges = [part.edges().sort_by_distance(p)[0] for p in [
        (48, 4, 22.5),
        (48, 4, 10.5),
        (26, 4, 48),
        (14, 4, 48),
    ]]
    fillet(redondeo7_edges, radius=REDONDEO7_R)

    # Croquis13 → Cortar-Extruir6 (cut, through all)
    with BuildSketch(Plane.XZ.offset(-20)):
        with Locations((0, -2)):
            Rectangle(CROQUIS13_W, CROQUIS13_H)
        with Locations((40, -2)):
            Rectangle(CROQUIS13_W, CROQUIS13_H)
    extrude(amount=-CORTAR_EXTRUIR6_DEPTH, mode=Mode.SUBTRACT)


solid = part.part
